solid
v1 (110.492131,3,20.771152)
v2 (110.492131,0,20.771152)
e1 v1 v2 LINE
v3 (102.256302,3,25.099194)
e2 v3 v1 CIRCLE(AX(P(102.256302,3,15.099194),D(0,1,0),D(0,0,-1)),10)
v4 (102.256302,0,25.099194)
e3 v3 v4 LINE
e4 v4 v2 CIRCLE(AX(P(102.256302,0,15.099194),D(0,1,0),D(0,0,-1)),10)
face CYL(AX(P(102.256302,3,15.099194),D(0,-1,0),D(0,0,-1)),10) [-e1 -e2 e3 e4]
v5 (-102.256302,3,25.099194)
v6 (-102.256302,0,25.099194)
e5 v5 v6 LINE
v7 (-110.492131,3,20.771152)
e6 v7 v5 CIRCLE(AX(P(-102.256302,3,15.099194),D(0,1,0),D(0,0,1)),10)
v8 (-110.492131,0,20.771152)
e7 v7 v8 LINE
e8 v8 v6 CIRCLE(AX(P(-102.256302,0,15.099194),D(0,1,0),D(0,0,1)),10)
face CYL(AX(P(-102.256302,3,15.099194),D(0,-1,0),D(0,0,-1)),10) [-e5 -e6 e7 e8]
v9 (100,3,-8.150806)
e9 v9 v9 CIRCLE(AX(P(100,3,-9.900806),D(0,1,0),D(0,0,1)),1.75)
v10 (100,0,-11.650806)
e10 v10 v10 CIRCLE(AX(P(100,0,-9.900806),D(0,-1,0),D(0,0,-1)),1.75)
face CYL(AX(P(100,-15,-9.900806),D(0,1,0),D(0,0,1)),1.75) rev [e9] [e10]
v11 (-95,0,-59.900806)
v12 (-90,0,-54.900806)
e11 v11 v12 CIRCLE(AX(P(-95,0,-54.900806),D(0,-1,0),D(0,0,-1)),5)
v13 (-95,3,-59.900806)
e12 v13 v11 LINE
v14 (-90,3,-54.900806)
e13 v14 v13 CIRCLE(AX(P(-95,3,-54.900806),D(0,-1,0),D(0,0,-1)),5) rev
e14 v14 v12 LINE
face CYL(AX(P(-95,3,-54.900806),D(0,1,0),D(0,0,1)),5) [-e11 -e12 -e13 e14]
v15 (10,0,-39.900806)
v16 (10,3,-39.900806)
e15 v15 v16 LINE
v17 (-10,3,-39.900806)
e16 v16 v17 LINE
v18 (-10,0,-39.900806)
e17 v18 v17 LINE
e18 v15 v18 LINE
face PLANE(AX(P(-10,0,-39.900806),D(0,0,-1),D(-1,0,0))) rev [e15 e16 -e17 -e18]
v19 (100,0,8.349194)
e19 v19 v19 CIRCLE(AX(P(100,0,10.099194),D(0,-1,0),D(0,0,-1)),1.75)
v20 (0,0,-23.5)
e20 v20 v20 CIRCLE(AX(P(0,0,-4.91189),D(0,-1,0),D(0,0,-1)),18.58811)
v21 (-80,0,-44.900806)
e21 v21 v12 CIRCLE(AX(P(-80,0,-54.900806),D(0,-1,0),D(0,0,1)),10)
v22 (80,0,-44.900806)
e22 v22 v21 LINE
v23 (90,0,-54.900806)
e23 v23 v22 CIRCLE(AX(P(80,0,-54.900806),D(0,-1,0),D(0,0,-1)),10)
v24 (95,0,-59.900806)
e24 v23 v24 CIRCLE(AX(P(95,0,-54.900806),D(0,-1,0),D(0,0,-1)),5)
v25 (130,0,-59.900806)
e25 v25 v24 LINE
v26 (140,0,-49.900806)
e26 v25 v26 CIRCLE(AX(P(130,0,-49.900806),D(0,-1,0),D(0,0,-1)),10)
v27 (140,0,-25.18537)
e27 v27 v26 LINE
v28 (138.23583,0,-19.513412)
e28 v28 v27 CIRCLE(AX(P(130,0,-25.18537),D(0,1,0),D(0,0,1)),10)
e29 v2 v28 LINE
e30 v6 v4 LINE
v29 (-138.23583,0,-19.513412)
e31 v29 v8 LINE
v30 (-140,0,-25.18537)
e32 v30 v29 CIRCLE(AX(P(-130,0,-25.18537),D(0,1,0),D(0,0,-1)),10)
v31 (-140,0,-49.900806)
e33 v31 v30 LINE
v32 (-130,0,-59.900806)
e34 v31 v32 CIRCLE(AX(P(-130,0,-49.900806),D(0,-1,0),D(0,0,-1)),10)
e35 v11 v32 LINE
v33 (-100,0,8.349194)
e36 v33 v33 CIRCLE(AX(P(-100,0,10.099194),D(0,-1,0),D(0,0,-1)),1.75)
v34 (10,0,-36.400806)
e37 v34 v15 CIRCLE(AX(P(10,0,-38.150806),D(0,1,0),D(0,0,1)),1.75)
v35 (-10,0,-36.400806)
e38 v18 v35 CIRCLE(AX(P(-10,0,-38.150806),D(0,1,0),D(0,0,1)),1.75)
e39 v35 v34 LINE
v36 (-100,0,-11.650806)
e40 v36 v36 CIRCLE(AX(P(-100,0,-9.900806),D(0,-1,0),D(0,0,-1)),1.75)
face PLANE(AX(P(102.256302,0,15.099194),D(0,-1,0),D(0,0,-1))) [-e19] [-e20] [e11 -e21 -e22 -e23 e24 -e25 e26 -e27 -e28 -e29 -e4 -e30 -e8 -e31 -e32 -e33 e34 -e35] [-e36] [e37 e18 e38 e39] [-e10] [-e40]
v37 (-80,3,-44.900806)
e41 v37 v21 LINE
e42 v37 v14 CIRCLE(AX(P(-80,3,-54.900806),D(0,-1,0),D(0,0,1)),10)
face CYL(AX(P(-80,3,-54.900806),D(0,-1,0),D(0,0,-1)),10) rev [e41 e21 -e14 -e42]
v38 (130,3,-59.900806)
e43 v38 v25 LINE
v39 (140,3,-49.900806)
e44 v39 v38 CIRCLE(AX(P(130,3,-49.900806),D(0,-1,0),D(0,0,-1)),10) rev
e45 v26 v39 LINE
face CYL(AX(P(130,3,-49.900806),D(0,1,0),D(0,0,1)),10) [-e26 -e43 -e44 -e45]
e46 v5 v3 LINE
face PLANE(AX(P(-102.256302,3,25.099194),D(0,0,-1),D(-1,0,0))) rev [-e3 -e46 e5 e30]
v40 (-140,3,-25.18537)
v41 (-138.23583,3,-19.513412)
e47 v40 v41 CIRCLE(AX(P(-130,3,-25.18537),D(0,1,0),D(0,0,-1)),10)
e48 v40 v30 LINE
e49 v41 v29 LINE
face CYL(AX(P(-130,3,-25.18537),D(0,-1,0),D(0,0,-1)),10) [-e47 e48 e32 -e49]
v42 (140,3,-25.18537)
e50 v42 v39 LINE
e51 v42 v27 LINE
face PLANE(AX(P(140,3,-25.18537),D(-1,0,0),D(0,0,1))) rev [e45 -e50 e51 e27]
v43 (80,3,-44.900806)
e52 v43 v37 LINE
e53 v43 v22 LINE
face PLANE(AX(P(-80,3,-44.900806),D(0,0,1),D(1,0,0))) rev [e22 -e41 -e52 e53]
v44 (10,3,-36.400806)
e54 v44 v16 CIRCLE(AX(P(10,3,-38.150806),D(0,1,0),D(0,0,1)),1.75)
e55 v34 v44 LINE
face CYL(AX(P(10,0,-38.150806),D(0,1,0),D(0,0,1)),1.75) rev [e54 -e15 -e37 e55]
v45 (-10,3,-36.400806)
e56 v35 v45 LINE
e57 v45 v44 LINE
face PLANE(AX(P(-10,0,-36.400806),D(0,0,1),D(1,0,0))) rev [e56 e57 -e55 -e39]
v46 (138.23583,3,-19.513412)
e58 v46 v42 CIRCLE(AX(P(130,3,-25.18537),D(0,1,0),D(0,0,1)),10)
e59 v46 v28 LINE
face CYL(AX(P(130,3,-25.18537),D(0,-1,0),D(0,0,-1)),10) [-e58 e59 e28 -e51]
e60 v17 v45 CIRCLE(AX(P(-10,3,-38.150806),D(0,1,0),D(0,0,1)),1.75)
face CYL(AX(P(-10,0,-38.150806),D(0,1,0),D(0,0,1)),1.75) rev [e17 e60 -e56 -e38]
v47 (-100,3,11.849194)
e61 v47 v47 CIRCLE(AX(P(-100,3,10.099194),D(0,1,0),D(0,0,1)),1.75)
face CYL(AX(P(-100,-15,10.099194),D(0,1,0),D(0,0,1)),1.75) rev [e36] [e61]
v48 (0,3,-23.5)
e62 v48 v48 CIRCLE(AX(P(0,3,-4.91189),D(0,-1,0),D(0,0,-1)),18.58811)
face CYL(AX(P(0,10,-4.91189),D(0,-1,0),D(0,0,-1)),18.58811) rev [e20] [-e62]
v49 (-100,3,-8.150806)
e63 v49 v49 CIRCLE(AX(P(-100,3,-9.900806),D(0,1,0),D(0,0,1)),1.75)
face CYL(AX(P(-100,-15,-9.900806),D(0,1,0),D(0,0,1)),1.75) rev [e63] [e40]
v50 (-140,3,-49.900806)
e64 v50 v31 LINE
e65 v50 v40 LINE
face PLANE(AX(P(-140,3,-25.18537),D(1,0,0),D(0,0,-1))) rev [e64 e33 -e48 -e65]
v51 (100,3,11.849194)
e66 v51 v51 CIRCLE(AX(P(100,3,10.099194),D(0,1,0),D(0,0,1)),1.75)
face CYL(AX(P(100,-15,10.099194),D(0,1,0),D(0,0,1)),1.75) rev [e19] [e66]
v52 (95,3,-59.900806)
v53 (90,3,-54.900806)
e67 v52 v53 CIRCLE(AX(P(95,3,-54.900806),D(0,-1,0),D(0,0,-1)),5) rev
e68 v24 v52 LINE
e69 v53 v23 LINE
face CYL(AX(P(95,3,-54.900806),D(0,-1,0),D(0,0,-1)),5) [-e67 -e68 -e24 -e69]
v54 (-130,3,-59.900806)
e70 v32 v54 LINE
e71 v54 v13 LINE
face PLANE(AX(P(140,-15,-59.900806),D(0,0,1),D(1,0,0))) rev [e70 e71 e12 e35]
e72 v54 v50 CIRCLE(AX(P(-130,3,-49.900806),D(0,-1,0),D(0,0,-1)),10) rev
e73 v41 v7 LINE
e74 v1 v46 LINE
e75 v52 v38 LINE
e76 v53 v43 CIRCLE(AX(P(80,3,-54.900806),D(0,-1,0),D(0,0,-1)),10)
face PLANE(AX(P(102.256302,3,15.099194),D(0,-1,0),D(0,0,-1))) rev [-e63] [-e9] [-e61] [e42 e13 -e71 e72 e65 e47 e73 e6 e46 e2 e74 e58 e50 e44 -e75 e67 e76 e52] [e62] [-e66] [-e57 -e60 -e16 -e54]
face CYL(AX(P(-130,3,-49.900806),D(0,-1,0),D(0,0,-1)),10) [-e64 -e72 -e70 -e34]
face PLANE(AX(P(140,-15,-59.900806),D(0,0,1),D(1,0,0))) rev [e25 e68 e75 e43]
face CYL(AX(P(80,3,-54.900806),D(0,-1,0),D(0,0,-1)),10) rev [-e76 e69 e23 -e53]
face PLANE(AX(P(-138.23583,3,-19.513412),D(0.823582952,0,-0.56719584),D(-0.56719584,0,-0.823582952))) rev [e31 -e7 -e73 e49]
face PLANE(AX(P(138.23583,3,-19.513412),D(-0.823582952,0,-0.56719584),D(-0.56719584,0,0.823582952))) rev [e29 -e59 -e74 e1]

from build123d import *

# Parameters (mm, degrees)
EXTRUDE_1_DEPTH     = 3
SKETCH_4_W          = 287.107775492
SKETCH_4_H          = 19.420897723
CUT_EXTRUDE_2_DEPTH = 18
FILLET_3_R          = 5
FILLET_4_R          = 10
SKETCH_5_R          = 1.75
CUT_EXTRUDE_3_DEPTH = 18
CUT_EXTRUDE_6_DEPTH = 3
SKETCH_9_R          = 18.588109785
CUT_EXTRUDE_7_DEPTH = 10


with BuildPart() as part:
    # 草图1 → 凸台-拉伸1 (new body)
    with BuildSketch(Plane(origin=(0, 0, 0), x_dir=(1, 0, 0), z_dir=(0, 1, 0))):
        with BuildLine():
            Line((-138.235829522, 19.513411872), (-110.492131082, -20.771152042))
            ThreePointArc((-110.492131082, -20.771152042), (-106.908205257, -23.951300285), (-102.25630156, -25.099193643))
            Line((-102.25630156, -25.099193643), (102.25630156, -25.099193643))
            ThreePointArc((102.25630156, -25.099193643), (106.908205257, -23.951300285), (110.492131082, -20.771152042))
            Line((110.492131082, -20.771152042), (138.235829522, 19.513411872))
            ThreePointArc((138.235829522, 19.513411872), (139.548777283, 22.215378286), (140, 25.185370271))
            Line((140, 25.185370271), (140, 65))
            ThreePointArc((140, 65), (137.100120957, 72.000927314), (130.099193643, 74.900806357))
            Line((130.099193643, 74.900806357), (100, 74.900806357))
            ThreePointArc((100, 74.900806357), (92.928932188, 71.971874169), (90, 64.900806357))
            Line((90, 64.900806357), (90, 54.900806357))
            ThreePointArc((90, 54.900806357), (87.071067812, 47.829738545), (80, 44.900806357))
            Line((80, 44.900806357), (-80, 44.900806357))
            ThreePointArc((-80, 44.900806357), (-87.071067812, 47.829738545), (-90, 54.900806357))
            Line((-90, 54.900806357), (-90, 64.900806357))
            ThreePointArc((-90, 64.900806357), (-92.928932188, 71.971874169), (-100, 74.900806357))
            Line((-100, 74.900806357), (-130.099193643, 74.900806357))
            ThreePointArc((-130.099193643, 74.900806357), (-137.100120957, 72.000927314), (-140, 65))
            Line((-140, 65), (-140, 25.185370271))
            ThreePointArc((-140, 25.185370271), (-139.548777283, 22.215378286), (-138.235829522, 19.513411872))
        make_face()
    extrude(amount=EXTRUDE_1_DEPTH)

    # 草图4 → 切除-拉伸2 (cut)
    with BuildSketch(Plane(origin=(0, 3, 0), x_dir=(1, 0, 0), z_dir=(0, 1, 0))):
        with Locations((-3.553887746, 69.611255219)):
            Rectangle(SKETCH_4_W, SKETCH_4_H)
    extrude(amount=-CUT_EXTRUDE_2_DEPTH, mode=Mode.SUBTRACT)

    # 圆角3
    fillet_3_edges = [part.edges().sort_by_distance(p)[0] for p in [
        (-90, 1.5, -59.900806357),
        (90, 1.5, -59.900806357),
    ]]
    fillet(fillet_3_edges, radius=FILLET_3_R - 0.0001)  # a hair under: the kernel refuses the full size

    # 圆角4
    fillet_4_edges = [part.edges().sort_by_distance(p)[0] for p in [
        (140, 1.5, -59.900806357),
        (-140, 1.5, -59.900806357),
    ]]
    fillet(fillet_4_edges, radius=FILLET_4_R)

    # 草图5 → 切除-拉伸3 (cut)
    with BuildSketch(Plane(origin=(0, 3, 0), x_dir=(1, 0, 0), z_dir=(0, 1, 0))):
        with Locations(Location((100, -10.099193643, 0), (0, 0, 270))):
            Circle(SKETCH_5_R)
        with Locations(Location((100, 9.900806357, 0), (0, 0, 270))):
            Circle(SKETCH_5_R)
        with Locations(Location((-100, -10.099193643, 0), (0, 0, 270))):
            Circle(SKETCH_5_R)
        with Locations(Location((-100, 9.900806357, 0), (0, 0, 270))):
            Circle(SKETCH_5_R)
    extrude(amount=-CUT_EXTRUDE_3_DEPTH, mode=Mode.SUBTRACT)

    # 草图8 → 切除-拉伸6 (cut)
    with BuildSketch(Plane(origin=(0, 3, 0), x_dir=(1, 0, 0), z_dir=(0, 1, 0))):
        with BuildLine():
            Line((-10, 39.900806357), (10, 39.900806357))
            ThreePointArc((10, 39.900806357), (11.75, 38.150806357), (10, 36.400806357))
            Line((10, 36.400806357), (-10, 36.400806357))
            ThreePointArc((-10, 36.400806357), (-11.75, 38.150806357), (-10, 39.900806357))
        make_face()
    extrude(amount=-CUT_EXTRUDE_6_DEPTH, mode=Mode.SUBTRACT)

    # 草图9 → 切除-拉伸7 (cut)
    with BuildSketch(Plane.XZ):
        with Locations(Location((0, -4.911890215, 0), (0, 0, 270))):
            Circle(SKETCH_9_R)
    extrude(amount=-CUT_EXTRUDE_7_DEPTH, mode=Mode.SUBTRACT)


solid = part.part
